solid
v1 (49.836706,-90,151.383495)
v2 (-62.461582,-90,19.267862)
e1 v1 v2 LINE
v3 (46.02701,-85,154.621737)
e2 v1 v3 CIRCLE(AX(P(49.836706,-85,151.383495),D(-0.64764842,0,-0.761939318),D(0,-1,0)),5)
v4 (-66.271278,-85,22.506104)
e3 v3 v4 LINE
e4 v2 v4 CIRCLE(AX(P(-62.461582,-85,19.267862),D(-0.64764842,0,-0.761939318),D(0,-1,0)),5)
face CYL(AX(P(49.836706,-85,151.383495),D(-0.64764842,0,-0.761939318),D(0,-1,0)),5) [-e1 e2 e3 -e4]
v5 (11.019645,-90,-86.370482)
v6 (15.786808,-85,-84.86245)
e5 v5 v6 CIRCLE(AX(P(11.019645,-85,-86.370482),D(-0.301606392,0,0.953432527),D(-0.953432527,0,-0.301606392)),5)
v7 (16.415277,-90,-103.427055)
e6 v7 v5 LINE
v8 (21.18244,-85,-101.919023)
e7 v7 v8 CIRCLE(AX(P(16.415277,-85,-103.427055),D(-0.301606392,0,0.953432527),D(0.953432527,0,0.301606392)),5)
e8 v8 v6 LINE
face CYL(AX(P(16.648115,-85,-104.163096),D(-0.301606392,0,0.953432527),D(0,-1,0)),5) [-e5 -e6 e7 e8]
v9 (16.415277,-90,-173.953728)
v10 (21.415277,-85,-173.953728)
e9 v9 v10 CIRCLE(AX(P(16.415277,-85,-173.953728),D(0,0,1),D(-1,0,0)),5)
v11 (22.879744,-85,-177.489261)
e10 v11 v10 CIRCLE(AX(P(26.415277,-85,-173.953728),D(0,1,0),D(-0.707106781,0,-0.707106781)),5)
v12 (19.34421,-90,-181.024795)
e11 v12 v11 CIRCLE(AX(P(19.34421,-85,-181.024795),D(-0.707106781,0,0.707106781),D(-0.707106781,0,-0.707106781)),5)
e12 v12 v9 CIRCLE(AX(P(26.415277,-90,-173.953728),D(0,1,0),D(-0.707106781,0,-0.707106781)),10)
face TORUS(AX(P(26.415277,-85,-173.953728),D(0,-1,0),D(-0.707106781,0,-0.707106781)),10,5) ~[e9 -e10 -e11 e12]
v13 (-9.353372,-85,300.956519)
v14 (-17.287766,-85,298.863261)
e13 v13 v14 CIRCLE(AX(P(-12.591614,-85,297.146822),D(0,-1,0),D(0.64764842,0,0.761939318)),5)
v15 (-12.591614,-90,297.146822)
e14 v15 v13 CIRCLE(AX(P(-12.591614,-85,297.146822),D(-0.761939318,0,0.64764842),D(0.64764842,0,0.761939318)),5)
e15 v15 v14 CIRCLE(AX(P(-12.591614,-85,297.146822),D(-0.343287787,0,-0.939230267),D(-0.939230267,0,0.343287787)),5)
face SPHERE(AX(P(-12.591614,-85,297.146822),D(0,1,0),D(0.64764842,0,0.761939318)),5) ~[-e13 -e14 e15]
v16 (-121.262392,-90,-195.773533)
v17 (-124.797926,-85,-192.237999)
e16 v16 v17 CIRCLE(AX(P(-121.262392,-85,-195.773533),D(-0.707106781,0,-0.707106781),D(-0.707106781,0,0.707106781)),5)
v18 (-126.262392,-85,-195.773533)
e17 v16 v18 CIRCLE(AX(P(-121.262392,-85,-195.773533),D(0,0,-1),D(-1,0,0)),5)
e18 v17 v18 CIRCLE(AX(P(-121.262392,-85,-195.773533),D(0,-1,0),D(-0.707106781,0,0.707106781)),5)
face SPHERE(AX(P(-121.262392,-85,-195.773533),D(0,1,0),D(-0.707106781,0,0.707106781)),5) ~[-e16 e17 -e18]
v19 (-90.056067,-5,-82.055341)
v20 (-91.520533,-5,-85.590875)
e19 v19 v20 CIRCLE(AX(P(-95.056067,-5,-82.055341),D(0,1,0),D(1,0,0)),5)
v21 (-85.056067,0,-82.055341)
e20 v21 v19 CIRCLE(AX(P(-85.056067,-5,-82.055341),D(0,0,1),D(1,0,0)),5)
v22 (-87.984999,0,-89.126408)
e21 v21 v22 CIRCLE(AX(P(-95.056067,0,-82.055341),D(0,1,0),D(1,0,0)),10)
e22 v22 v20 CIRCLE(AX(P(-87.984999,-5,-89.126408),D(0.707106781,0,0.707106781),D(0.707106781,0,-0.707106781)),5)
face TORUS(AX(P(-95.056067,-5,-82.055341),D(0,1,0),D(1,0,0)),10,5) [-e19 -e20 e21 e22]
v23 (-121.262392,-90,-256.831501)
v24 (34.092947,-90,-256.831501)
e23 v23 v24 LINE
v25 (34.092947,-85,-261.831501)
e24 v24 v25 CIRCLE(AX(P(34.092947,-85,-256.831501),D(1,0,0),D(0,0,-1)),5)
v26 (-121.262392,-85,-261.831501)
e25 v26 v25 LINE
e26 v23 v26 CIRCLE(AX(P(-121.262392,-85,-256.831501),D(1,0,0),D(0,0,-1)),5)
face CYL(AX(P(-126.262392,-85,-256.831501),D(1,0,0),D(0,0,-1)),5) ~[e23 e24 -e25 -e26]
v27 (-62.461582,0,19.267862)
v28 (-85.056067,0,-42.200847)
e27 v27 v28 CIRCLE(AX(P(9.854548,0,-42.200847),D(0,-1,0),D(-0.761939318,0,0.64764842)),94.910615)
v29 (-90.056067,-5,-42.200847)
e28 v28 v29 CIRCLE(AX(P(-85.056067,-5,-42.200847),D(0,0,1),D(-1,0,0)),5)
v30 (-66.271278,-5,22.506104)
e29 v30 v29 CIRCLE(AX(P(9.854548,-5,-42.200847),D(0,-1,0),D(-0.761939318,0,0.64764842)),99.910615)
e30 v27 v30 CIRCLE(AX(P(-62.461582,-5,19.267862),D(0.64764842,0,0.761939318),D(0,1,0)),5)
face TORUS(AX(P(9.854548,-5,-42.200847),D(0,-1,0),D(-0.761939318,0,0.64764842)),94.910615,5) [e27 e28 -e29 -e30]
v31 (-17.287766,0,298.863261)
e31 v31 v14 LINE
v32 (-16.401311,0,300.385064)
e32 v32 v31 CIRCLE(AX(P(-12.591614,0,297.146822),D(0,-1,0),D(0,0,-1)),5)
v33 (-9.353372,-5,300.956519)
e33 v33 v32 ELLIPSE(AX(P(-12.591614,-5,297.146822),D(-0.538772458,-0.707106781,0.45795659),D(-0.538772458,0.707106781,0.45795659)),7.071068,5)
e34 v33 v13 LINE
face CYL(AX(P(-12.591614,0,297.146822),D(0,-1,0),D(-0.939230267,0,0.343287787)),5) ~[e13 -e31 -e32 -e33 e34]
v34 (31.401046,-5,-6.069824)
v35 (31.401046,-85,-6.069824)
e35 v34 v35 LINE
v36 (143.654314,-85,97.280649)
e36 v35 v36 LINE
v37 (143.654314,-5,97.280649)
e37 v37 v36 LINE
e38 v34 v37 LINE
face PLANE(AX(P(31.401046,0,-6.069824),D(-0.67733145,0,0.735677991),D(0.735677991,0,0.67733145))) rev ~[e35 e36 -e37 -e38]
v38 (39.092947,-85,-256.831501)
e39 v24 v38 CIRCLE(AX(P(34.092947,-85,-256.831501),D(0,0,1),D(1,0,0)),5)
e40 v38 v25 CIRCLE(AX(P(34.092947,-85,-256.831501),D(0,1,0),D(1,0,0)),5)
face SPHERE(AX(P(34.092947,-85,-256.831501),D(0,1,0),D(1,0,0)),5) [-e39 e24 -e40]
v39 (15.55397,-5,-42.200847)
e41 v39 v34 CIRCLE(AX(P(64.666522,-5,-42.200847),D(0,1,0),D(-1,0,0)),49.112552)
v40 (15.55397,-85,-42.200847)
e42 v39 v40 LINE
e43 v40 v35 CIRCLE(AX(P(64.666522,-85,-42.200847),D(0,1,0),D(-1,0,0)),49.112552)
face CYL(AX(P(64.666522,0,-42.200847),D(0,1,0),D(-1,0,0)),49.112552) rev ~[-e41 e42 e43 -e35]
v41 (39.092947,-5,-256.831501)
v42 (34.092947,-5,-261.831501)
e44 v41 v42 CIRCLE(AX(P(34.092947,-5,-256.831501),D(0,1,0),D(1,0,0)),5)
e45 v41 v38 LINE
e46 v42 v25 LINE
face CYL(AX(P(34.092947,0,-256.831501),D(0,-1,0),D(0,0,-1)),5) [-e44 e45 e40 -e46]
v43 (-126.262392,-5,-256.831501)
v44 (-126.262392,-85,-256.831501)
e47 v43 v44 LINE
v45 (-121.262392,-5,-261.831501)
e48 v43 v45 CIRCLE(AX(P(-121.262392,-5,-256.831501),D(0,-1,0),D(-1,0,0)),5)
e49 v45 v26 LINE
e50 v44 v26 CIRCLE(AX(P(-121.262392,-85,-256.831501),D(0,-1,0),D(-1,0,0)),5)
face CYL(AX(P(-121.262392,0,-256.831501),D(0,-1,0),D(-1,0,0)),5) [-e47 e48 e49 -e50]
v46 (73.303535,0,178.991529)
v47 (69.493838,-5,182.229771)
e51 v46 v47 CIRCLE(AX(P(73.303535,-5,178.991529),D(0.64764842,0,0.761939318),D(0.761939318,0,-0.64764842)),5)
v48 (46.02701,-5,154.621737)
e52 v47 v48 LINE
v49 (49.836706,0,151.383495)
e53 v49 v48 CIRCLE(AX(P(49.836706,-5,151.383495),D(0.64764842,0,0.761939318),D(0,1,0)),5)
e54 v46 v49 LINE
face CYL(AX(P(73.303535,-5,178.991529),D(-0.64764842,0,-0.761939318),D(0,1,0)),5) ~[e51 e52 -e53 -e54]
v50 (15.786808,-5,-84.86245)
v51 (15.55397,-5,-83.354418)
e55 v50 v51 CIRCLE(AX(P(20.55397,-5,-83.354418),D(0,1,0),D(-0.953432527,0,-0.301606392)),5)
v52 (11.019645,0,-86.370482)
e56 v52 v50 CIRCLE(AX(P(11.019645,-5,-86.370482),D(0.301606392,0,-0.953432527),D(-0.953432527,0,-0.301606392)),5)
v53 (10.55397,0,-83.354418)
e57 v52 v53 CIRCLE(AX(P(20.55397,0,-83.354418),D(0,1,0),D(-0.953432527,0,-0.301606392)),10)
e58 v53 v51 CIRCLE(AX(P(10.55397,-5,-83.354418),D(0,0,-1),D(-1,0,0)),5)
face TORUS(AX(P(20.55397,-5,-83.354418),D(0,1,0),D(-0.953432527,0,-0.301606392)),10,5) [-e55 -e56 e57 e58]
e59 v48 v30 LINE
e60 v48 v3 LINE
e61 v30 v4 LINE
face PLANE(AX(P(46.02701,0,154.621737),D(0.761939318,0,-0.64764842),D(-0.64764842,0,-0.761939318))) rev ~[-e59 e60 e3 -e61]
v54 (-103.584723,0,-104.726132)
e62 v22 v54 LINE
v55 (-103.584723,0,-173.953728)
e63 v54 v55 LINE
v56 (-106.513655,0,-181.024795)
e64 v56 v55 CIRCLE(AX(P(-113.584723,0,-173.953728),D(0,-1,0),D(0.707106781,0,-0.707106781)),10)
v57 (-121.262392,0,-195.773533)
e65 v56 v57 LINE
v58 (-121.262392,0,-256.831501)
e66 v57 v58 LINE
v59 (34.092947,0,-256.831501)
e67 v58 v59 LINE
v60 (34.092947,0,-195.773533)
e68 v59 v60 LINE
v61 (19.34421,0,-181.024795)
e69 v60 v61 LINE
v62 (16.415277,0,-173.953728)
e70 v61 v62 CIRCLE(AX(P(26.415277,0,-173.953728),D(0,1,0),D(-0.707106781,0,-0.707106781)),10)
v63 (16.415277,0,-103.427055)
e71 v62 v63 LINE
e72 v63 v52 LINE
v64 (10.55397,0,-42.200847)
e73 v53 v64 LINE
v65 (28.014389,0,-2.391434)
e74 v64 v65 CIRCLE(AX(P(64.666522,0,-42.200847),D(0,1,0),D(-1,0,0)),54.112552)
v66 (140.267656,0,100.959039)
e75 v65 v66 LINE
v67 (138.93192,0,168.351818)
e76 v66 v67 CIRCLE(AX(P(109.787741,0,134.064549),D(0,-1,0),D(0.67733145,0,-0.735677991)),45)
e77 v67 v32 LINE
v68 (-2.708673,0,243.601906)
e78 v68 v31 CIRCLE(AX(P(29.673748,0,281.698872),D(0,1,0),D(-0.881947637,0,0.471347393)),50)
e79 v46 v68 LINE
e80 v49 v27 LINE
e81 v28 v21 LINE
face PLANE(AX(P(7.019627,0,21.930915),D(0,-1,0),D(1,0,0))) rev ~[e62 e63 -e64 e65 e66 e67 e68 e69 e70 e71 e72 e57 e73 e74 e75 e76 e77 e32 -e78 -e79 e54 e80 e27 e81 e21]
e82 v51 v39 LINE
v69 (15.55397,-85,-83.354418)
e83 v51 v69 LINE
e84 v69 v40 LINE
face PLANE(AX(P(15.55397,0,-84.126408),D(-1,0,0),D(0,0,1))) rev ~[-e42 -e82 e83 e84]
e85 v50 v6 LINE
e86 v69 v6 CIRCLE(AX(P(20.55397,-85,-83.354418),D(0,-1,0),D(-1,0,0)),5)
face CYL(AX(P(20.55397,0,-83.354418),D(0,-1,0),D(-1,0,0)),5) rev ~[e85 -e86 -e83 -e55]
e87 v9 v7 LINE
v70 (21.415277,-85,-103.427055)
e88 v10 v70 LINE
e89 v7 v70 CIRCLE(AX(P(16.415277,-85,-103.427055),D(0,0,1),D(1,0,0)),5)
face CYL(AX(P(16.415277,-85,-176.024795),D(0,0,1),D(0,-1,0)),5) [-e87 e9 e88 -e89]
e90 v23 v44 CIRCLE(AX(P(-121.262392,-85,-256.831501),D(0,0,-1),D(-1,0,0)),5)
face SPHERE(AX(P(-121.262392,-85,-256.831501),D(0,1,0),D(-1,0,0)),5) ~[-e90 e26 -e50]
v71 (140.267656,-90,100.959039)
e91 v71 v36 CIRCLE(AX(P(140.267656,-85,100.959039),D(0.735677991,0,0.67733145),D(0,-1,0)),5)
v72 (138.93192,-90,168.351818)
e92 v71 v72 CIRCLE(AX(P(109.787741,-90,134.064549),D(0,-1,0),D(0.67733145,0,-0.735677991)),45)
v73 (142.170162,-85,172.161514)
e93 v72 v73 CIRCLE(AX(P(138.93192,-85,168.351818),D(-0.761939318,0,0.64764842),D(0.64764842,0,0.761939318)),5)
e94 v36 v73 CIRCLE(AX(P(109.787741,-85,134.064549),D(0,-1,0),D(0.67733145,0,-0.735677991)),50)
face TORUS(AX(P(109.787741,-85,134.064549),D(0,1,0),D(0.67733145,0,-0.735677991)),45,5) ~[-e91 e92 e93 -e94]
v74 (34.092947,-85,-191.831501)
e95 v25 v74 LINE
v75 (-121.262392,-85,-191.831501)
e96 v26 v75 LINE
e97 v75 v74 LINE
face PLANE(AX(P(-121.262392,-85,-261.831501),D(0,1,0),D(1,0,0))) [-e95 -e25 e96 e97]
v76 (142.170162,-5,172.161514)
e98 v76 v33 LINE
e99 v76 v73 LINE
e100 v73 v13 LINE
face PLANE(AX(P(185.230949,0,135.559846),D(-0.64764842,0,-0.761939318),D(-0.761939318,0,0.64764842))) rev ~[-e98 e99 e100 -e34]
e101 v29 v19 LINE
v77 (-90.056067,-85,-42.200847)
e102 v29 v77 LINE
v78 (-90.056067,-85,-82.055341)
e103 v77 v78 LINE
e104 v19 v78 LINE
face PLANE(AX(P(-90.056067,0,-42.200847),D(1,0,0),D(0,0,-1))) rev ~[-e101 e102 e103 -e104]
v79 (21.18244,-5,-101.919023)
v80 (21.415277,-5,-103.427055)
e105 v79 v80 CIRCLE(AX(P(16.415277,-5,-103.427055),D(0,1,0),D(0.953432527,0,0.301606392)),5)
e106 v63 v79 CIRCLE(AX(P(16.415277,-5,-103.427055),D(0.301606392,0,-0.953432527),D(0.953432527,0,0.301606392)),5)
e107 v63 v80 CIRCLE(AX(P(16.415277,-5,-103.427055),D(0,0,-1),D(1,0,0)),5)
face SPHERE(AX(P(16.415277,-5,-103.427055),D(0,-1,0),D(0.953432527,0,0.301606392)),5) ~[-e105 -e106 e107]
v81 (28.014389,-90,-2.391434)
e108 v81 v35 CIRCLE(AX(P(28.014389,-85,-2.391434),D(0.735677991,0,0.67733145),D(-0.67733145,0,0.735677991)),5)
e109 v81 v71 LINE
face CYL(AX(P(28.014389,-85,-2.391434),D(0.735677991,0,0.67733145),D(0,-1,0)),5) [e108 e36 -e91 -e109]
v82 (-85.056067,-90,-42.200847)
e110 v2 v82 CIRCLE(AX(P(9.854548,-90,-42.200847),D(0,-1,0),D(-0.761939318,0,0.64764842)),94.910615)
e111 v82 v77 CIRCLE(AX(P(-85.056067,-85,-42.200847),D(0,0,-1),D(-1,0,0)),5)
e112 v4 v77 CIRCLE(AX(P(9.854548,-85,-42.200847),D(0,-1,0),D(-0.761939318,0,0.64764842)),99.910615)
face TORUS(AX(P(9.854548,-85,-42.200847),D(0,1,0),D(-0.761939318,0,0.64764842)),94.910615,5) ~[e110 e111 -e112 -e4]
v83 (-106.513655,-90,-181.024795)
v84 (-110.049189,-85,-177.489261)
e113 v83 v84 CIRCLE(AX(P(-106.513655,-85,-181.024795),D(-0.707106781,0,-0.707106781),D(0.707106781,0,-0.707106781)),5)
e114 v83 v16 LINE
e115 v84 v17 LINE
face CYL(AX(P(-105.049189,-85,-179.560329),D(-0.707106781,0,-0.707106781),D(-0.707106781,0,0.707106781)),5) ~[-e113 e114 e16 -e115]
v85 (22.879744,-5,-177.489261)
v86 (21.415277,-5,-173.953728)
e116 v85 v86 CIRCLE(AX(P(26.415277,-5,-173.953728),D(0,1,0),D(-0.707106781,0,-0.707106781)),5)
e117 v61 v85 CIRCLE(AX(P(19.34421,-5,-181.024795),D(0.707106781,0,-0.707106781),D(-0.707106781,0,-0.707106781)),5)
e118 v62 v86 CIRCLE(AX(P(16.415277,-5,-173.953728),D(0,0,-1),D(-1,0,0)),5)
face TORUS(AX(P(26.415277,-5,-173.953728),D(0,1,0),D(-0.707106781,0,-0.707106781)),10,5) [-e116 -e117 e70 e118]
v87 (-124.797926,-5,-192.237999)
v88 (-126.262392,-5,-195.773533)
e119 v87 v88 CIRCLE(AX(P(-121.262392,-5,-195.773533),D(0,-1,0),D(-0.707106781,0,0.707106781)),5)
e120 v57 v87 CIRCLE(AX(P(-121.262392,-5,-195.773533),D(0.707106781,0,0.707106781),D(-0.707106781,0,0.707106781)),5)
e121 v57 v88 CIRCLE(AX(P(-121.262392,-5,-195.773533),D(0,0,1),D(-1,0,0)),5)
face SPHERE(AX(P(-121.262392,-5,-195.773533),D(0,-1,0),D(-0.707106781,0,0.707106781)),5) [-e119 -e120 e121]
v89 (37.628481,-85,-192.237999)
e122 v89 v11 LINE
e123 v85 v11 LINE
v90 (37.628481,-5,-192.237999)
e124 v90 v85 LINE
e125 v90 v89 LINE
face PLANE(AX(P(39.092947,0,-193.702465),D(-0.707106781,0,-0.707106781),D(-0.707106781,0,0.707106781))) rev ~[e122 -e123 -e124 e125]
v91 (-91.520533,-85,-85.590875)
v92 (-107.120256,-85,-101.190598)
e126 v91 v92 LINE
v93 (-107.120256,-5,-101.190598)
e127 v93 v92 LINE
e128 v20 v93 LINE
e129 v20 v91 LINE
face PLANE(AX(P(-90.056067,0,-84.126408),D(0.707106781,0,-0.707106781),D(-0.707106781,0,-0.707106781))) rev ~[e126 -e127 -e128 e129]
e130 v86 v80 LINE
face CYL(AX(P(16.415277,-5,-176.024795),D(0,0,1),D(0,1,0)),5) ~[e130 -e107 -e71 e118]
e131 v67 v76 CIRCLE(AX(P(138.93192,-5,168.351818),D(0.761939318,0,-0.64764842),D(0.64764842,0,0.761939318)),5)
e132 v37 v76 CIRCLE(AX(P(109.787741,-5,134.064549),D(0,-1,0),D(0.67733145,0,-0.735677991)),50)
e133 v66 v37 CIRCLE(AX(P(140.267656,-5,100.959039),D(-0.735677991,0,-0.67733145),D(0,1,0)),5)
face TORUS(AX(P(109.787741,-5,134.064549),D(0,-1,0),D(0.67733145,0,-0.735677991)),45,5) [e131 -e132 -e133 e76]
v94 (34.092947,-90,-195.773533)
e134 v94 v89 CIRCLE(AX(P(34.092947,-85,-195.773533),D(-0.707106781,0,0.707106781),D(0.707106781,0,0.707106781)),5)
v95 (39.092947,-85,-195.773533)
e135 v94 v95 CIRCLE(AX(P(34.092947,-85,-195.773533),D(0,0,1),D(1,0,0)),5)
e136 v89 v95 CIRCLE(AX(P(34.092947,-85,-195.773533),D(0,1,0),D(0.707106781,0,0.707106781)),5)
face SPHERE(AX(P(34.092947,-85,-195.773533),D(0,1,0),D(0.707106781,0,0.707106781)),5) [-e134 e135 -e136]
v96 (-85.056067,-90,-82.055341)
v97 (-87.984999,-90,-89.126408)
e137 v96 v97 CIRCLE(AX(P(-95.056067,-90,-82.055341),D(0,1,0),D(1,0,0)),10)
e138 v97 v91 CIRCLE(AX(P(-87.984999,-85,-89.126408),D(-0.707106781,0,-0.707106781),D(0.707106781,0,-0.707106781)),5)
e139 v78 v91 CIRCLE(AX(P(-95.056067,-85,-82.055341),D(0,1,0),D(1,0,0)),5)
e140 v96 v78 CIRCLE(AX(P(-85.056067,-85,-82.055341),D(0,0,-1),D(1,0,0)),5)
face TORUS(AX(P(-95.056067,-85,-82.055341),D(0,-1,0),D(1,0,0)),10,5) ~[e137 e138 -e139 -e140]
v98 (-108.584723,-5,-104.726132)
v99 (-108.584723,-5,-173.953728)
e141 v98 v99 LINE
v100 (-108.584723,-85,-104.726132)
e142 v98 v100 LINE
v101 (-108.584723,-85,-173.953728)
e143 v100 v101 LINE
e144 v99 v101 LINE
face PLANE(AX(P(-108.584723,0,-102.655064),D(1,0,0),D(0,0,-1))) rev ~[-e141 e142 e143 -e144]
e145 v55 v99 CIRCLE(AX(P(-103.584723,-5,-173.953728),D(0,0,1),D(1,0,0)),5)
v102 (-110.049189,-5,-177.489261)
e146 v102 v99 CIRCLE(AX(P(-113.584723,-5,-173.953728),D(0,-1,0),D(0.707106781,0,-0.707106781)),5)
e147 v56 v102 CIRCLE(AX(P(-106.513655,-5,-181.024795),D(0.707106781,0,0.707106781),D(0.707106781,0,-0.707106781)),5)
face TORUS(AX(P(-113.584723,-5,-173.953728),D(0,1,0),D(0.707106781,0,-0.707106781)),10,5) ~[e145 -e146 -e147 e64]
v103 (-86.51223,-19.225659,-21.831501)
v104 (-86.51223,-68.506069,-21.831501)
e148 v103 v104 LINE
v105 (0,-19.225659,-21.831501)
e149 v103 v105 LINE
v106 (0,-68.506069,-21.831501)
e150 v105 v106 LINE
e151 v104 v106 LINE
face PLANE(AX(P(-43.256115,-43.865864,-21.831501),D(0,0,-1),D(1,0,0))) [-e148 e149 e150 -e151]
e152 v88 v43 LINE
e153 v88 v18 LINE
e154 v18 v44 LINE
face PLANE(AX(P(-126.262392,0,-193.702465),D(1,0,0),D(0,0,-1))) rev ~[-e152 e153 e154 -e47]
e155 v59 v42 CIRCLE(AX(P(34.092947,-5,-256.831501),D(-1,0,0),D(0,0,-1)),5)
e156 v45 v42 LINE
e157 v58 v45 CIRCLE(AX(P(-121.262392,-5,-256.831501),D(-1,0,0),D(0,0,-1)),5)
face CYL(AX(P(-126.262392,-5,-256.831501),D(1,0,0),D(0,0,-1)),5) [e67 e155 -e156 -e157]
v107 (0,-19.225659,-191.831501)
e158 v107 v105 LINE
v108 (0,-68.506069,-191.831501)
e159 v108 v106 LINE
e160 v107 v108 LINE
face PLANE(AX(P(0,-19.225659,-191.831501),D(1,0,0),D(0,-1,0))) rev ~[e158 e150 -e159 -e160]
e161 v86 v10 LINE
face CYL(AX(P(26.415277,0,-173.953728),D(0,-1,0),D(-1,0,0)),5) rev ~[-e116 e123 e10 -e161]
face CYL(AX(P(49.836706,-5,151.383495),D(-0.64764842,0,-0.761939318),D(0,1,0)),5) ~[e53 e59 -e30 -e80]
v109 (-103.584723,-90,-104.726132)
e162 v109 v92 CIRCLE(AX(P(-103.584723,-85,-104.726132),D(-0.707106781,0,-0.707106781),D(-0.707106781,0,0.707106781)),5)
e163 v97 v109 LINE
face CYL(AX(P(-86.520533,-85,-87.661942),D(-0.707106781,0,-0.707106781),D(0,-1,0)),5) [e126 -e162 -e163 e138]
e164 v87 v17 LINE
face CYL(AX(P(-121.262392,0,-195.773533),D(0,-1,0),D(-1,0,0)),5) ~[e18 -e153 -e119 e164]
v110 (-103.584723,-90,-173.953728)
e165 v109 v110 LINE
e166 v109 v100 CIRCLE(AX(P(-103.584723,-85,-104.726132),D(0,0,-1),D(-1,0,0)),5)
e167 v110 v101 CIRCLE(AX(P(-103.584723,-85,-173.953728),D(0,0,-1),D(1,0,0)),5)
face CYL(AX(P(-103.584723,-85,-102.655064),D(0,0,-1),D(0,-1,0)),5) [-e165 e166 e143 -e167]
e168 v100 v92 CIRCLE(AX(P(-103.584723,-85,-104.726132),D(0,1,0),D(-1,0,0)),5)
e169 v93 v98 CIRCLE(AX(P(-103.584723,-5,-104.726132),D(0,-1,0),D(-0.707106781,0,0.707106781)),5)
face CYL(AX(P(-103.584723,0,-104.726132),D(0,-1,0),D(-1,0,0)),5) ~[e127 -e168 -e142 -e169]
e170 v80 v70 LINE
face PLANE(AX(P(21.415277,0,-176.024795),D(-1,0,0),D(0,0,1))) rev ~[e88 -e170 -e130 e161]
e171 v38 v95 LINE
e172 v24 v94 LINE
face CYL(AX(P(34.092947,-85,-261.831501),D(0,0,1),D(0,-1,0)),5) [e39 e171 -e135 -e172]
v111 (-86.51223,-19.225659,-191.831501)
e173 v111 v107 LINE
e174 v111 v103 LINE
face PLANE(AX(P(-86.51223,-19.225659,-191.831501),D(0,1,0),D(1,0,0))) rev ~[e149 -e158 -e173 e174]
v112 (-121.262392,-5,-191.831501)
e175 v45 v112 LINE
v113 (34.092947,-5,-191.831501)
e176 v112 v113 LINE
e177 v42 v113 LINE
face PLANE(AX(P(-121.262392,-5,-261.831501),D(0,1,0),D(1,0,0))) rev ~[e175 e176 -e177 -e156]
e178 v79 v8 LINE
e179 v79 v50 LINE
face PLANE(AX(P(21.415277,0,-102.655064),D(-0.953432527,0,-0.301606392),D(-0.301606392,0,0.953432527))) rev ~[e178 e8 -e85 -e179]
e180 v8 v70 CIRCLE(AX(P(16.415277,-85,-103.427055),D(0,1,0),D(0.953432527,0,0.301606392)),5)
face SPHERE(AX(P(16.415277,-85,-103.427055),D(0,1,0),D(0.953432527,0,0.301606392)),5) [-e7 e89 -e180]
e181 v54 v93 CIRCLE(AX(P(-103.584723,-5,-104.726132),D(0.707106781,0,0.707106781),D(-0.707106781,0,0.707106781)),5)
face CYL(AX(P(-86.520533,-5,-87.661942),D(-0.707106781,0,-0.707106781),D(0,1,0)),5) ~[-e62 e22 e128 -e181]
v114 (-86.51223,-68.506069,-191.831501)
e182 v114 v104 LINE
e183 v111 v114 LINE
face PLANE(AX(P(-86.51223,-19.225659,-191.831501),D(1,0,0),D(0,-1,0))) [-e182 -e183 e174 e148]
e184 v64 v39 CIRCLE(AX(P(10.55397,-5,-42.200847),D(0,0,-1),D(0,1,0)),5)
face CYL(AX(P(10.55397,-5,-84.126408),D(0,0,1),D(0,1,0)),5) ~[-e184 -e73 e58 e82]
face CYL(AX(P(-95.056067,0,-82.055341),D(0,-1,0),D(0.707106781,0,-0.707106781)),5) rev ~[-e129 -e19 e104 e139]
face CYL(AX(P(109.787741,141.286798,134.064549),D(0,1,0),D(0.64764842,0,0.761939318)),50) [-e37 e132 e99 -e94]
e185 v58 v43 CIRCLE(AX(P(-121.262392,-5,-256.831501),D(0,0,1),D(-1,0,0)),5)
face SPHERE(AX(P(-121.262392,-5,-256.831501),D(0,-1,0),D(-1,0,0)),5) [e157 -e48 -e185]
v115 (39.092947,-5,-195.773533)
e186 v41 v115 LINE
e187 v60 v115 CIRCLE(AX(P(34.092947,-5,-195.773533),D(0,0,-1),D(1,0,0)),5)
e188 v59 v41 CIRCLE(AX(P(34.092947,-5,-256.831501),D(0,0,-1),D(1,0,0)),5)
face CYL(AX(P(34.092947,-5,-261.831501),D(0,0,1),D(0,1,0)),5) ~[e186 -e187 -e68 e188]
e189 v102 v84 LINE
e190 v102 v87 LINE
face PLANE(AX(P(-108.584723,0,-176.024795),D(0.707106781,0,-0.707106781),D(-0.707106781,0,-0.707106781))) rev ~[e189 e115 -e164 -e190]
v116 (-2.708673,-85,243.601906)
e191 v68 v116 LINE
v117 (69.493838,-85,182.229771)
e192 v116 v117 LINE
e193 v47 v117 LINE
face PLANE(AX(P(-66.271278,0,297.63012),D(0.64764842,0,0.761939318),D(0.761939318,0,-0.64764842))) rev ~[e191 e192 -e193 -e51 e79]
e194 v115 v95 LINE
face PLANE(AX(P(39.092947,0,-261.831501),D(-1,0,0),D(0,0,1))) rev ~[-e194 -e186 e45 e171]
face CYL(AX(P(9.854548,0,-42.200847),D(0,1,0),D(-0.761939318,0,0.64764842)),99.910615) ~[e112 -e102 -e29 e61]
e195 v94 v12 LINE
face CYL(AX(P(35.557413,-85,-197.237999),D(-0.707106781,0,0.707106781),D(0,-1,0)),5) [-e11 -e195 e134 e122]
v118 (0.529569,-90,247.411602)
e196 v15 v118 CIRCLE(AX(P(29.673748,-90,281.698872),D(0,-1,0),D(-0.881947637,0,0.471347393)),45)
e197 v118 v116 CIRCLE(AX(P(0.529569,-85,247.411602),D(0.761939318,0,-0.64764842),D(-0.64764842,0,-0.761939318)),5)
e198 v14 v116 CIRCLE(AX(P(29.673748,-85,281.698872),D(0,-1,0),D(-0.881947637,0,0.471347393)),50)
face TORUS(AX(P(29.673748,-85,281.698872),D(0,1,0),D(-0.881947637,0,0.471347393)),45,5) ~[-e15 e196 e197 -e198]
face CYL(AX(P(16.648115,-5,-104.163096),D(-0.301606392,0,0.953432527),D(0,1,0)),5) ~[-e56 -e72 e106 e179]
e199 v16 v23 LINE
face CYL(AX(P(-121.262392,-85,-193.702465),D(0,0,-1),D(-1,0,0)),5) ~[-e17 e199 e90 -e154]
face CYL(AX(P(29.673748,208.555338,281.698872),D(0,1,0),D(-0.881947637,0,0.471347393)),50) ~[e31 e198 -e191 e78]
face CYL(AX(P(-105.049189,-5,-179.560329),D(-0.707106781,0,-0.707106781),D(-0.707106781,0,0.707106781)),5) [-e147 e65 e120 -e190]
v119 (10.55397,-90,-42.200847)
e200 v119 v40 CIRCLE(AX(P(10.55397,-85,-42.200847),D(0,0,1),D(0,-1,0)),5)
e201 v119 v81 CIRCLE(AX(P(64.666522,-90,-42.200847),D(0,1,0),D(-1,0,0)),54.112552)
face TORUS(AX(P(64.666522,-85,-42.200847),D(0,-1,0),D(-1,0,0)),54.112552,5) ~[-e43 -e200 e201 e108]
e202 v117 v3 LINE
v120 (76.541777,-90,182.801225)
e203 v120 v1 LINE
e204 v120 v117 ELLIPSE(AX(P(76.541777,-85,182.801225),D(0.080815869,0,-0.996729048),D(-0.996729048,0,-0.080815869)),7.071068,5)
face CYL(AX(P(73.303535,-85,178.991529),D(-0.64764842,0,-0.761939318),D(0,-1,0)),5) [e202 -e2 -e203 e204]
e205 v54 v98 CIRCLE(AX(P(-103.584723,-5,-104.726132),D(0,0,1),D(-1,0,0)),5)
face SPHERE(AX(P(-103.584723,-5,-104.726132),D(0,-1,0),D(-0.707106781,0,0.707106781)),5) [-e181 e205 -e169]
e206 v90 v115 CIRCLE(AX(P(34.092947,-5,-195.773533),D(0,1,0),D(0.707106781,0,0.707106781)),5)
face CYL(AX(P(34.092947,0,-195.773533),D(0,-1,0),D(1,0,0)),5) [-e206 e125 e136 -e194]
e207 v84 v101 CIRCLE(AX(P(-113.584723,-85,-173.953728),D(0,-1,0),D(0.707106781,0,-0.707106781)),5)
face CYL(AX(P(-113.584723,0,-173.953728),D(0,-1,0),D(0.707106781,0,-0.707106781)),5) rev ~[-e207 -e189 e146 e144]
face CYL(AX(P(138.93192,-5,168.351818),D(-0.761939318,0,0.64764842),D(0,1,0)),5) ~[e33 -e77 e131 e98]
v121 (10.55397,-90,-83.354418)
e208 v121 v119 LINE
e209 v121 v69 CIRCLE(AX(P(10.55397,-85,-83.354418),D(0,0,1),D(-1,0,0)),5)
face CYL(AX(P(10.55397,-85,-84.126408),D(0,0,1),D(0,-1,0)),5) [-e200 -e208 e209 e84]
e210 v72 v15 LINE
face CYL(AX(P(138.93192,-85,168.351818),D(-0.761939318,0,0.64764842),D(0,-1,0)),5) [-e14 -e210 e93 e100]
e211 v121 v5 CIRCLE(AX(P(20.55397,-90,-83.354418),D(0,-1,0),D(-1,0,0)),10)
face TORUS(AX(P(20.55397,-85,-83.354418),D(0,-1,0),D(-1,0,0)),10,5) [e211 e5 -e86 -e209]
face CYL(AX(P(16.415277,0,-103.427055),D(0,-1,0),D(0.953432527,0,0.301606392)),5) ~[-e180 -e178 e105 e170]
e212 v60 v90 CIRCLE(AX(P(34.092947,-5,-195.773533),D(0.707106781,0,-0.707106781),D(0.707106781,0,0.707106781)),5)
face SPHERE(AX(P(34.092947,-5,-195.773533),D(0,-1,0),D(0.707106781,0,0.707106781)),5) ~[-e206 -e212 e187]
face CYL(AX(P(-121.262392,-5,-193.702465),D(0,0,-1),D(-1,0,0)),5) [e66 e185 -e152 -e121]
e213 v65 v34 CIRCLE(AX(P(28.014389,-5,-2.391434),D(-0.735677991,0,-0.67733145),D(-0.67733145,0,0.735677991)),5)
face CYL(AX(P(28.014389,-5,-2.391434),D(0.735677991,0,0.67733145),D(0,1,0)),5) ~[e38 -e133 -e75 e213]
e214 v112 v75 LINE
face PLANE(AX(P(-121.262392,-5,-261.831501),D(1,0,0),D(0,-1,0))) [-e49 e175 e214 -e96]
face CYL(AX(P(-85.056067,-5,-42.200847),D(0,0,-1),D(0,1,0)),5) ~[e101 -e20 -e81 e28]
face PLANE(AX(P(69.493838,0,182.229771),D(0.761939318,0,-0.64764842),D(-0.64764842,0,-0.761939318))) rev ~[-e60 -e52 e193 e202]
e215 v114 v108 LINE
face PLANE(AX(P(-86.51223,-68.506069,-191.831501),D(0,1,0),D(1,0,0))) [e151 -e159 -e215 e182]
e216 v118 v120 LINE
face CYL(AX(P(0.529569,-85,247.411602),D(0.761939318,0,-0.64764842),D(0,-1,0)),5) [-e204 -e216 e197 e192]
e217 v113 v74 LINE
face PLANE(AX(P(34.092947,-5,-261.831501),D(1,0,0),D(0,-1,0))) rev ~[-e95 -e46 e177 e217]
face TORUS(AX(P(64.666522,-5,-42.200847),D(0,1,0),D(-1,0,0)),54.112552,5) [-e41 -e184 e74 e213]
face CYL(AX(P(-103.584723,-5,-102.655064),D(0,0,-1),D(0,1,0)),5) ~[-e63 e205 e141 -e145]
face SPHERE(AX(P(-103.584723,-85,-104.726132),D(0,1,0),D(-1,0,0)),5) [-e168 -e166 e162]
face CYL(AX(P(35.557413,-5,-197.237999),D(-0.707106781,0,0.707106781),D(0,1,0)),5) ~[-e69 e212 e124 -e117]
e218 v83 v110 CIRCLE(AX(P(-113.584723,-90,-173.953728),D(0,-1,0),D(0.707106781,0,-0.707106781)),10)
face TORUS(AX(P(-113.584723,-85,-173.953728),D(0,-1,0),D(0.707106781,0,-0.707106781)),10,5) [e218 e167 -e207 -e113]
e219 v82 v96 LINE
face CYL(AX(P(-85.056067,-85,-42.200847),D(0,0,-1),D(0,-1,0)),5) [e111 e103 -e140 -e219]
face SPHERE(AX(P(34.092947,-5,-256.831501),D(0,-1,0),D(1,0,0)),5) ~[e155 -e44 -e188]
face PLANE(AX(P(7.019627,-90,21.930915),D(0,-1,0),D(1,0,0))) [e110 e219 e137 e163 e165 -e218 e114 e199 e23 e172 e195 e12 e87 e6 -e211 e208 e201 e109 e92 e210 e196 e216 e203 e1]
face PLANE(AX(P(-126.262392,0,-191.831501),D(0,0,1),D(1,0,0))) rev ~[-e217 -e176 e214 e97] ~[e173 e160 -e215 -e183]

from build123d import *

# Parameters (mm, degrees)
F1_DEPTH    = 90
F2_T1_DEPTH = 507.1106760185
F2_T3_DEPTH = 372.5735965904
F3_R        = 5
F4_DEPTH    = 70
F5_W        = 86.5122303367
F5_H        = 49.2804106325
F6_DEPTH    = 170


# Not quite as in the source:
# - a fillet or chamfer that OpenCascade refuses, or shapes differently, is made with other operations: its cross-section is extruded or revolved along the edge and cut away or added


with BuildPart() as f1:
    # F0 (on Front) → F1 (new body)
    with BuildSketch(Plane.XZ):
        with BuildLine():
            Line((-126.2623920763, -193.7024648741), (-126.2623920763, -261.8315013925))
            Line((-126.2623920763, -261.8315013925), (39.092946983, -261.8315013925))
            Line((39.092946983, -261.8315013925), (39.092946983, -193.7024648741))
            Line((39.092946983, -193.7024648741), (21.4152774533, -176.0247953445))
            Line((21.4152774533, -176.0247953445), (21.4152774533, -102.6550637093))
            Line((21.4152774533, -102.6550637093), (15.5539703198, -84.1264084333))
            Line((15.5539703198, -84.1264084333), (15.5539703198, -42.2008474989))
            ThreePointArc((15.5539703198, -42.2008474989), (19.6898884351, -22.4740848198), (31.401046165, -6.0698241209))
            Line((31.401046165, -6.0698241209), (185.2309488965, 135.5598457642))
            Line((185.2309488965, 135.5598457642), (-14.4236341973, 305.266241394))
            Line((-14.4236341973, 305.266241394), (-66.2712781132, 297.6301199255))
            Line((-66.2712781132, 297.6301199255), (-11.4975965547, 251.0724906007))
            Line((-11.4975965547, 251.0724906007), (69.4938383905, 182.2297708973))
            Line((69.4938383905, 182.2297708973), (46.0270096541, 154.6217370896))
            Line((46.0270096541, 154.6217370896), (-66.2712781132, 22.5061044222))
            ThreePointArc((-66.2712781132, 22.5061044222), (-83.9215394862, -7.7309119674), (-90.0560672706, -42.2008474989))
            Line((-90.0560672706, -42.2008474989), (-90.0560672706, -84.1264084333))
            Line((-90.0560672706, -84.1264084333), (-108.5847225467, -102.6550637093))
            Line((-108.5847225467, -102.6550637093), (-108.5847225467, -176.0247953445))
            Line((-108.5847225467, -176.0247953445), (-126.2623920763, -193.7024648741))
        make_face()
    extrude(amount=F1_DEPTH)

    # F2: fillet of radius 50 on 2 edges, made by hand

    # F2_s2 → F2_t1 (cut)
    with BuildSketch(Plane.XZ.offset(-208.5553380092)):
        with BuildLine():
            ThreePointArc((-14.4236341973, 305.266241394), (-19.4476593821, 272.3668104124), (-2.7086733301, 243.6019058598))
            Line((-2.7086733301, 243.6019058598), (-66.2712781132, 297.6301199255))
            Line((-66.2712781132, 297.6301199255), (-14.4236341973, 305.266241394))
        make_face()
    extrude(amount=F2_T1_DEPTH, mode=Mode.SUBTRACT)

    # F2_s4 → F2_t3 (cut)
    with BuildSketch(Plane.XZ.offset(-141.2867982952)):
        with BuildLine():
            ThreePointArc((142.1701622159, 172.1615144427), (159.7779231252, 135.0553624638), (143.6543137068, 97.2806489872))
            Line((143.6543137068, 97.2806489872), (185.2309488965, 135.5598457642))
            Line((185.2309488965, 135.5598457642), (142.1701622159, 172.1615144427))
        make_face()
    extrude(amount=F2_T3_DEPTH, mode=Mode.SUBTRACT)

    # F3
    f3_edges = [f1.edges().sort_by_distance(p)[0] for p in [
        (39.092947, -45, -193.702465),
        (21.415277, -45, -176.024795),
        (30.254112, 0, -184.86363),
        (30.254112, -90, -184.86363),
        (-108.584723, 0, -139.33993),
        (-108.584723, -45, -176.024795),
        (-126.262392, -45, -193.702465),
        (-117.423557, 0, -184.86363),
        (-117.423557, -90, -184.86363),
        (-126.262392, -45, -261.831501),
        (-126.262392, 0, -227.766983),
        (-126.262392, -90, -227.766983),
        (-108.584723, -45, -102.655064),
        (-90.056067, -45, -42.200847),
        (-90.056067, -45, -84.126408),
        (-90.056067, 0, -63.163628),
        (-90.056067, -90, -63.163628),
        (-66.271278, -45, 22.506104),
        (-83.921539, 0, -7.730912),
        (-83.921539, -90, -7.730912),
        (63.873264, 0, 238.713878),
        (-14.423634, -45, 305.266241),
        (63.873264, -90, 238.713878),
        (142.170162, -45, 172.161514),
        (39.092947, -45, -261.831501),
        (39.092947, 0, -227.766983),
        (39.092947, -90, -227.766983),
        (-43.584723, 0, -261.831501),
        (1.61128, -90, 102.367938),
        (33.392583, -90, 212.915838),
        (-19.447659, -90, 272.36681),
        (159.777923, -90, 135.055362),
        (87.52768, -90, 45.605412),
        (19.689888, -90, -22.474085),
        (15.55397, -90, -63.163628),
        (18.484624, -90, -93.390736),
        (21.415277, -90, -139.33993),
        (-43.584723, -90, -261.831501),
        (-108.584723, -90, -139.33993),
        (-99.320395, -90, -93.390736),
        (21.415277, -45, -102.655064),
        (15.55397, -45, -84.126408),
        (18.484624, 0, -93.390736),
        (1.61128, 0, 102.367938),
        (159.777923, 0, 135.055362),
        (87.52768, 0, 45.605412),
        (19.689888, 0, -22.474085),
        (15.55397, 0, -63.163628),
        (21.415277, 0, -139.33993),
        (-99.320395, 0, -93.390736),
    ]]
    fillet(f3_edges, radius=F3_R)

    # F4 (cut): a face of the model
    f4_faces = [f1.faces().sort_by_distance(p)[0] for p in [
        (-43.5847225467, -45, -261.8315013925),
    ]]
    extrude(f4_faces, amount=-F4_DEPTH, mode=Mode.SUBTRACT)

    # F5 (on face) → F6 (cut)
    with BuildSketch(Plane(origin=(0, 0, -191.8315013925), x_dir=(1, 0, 0), z_dir=(0, 0, -1))):
        with Locations((-43.2561151683, 43.8658641651)):
            Rectangle(F5_W, F5_H)
    extrude(amount=-F6_DEPTH, mode=Mode.SUBTRACT)


solid = f1.part
